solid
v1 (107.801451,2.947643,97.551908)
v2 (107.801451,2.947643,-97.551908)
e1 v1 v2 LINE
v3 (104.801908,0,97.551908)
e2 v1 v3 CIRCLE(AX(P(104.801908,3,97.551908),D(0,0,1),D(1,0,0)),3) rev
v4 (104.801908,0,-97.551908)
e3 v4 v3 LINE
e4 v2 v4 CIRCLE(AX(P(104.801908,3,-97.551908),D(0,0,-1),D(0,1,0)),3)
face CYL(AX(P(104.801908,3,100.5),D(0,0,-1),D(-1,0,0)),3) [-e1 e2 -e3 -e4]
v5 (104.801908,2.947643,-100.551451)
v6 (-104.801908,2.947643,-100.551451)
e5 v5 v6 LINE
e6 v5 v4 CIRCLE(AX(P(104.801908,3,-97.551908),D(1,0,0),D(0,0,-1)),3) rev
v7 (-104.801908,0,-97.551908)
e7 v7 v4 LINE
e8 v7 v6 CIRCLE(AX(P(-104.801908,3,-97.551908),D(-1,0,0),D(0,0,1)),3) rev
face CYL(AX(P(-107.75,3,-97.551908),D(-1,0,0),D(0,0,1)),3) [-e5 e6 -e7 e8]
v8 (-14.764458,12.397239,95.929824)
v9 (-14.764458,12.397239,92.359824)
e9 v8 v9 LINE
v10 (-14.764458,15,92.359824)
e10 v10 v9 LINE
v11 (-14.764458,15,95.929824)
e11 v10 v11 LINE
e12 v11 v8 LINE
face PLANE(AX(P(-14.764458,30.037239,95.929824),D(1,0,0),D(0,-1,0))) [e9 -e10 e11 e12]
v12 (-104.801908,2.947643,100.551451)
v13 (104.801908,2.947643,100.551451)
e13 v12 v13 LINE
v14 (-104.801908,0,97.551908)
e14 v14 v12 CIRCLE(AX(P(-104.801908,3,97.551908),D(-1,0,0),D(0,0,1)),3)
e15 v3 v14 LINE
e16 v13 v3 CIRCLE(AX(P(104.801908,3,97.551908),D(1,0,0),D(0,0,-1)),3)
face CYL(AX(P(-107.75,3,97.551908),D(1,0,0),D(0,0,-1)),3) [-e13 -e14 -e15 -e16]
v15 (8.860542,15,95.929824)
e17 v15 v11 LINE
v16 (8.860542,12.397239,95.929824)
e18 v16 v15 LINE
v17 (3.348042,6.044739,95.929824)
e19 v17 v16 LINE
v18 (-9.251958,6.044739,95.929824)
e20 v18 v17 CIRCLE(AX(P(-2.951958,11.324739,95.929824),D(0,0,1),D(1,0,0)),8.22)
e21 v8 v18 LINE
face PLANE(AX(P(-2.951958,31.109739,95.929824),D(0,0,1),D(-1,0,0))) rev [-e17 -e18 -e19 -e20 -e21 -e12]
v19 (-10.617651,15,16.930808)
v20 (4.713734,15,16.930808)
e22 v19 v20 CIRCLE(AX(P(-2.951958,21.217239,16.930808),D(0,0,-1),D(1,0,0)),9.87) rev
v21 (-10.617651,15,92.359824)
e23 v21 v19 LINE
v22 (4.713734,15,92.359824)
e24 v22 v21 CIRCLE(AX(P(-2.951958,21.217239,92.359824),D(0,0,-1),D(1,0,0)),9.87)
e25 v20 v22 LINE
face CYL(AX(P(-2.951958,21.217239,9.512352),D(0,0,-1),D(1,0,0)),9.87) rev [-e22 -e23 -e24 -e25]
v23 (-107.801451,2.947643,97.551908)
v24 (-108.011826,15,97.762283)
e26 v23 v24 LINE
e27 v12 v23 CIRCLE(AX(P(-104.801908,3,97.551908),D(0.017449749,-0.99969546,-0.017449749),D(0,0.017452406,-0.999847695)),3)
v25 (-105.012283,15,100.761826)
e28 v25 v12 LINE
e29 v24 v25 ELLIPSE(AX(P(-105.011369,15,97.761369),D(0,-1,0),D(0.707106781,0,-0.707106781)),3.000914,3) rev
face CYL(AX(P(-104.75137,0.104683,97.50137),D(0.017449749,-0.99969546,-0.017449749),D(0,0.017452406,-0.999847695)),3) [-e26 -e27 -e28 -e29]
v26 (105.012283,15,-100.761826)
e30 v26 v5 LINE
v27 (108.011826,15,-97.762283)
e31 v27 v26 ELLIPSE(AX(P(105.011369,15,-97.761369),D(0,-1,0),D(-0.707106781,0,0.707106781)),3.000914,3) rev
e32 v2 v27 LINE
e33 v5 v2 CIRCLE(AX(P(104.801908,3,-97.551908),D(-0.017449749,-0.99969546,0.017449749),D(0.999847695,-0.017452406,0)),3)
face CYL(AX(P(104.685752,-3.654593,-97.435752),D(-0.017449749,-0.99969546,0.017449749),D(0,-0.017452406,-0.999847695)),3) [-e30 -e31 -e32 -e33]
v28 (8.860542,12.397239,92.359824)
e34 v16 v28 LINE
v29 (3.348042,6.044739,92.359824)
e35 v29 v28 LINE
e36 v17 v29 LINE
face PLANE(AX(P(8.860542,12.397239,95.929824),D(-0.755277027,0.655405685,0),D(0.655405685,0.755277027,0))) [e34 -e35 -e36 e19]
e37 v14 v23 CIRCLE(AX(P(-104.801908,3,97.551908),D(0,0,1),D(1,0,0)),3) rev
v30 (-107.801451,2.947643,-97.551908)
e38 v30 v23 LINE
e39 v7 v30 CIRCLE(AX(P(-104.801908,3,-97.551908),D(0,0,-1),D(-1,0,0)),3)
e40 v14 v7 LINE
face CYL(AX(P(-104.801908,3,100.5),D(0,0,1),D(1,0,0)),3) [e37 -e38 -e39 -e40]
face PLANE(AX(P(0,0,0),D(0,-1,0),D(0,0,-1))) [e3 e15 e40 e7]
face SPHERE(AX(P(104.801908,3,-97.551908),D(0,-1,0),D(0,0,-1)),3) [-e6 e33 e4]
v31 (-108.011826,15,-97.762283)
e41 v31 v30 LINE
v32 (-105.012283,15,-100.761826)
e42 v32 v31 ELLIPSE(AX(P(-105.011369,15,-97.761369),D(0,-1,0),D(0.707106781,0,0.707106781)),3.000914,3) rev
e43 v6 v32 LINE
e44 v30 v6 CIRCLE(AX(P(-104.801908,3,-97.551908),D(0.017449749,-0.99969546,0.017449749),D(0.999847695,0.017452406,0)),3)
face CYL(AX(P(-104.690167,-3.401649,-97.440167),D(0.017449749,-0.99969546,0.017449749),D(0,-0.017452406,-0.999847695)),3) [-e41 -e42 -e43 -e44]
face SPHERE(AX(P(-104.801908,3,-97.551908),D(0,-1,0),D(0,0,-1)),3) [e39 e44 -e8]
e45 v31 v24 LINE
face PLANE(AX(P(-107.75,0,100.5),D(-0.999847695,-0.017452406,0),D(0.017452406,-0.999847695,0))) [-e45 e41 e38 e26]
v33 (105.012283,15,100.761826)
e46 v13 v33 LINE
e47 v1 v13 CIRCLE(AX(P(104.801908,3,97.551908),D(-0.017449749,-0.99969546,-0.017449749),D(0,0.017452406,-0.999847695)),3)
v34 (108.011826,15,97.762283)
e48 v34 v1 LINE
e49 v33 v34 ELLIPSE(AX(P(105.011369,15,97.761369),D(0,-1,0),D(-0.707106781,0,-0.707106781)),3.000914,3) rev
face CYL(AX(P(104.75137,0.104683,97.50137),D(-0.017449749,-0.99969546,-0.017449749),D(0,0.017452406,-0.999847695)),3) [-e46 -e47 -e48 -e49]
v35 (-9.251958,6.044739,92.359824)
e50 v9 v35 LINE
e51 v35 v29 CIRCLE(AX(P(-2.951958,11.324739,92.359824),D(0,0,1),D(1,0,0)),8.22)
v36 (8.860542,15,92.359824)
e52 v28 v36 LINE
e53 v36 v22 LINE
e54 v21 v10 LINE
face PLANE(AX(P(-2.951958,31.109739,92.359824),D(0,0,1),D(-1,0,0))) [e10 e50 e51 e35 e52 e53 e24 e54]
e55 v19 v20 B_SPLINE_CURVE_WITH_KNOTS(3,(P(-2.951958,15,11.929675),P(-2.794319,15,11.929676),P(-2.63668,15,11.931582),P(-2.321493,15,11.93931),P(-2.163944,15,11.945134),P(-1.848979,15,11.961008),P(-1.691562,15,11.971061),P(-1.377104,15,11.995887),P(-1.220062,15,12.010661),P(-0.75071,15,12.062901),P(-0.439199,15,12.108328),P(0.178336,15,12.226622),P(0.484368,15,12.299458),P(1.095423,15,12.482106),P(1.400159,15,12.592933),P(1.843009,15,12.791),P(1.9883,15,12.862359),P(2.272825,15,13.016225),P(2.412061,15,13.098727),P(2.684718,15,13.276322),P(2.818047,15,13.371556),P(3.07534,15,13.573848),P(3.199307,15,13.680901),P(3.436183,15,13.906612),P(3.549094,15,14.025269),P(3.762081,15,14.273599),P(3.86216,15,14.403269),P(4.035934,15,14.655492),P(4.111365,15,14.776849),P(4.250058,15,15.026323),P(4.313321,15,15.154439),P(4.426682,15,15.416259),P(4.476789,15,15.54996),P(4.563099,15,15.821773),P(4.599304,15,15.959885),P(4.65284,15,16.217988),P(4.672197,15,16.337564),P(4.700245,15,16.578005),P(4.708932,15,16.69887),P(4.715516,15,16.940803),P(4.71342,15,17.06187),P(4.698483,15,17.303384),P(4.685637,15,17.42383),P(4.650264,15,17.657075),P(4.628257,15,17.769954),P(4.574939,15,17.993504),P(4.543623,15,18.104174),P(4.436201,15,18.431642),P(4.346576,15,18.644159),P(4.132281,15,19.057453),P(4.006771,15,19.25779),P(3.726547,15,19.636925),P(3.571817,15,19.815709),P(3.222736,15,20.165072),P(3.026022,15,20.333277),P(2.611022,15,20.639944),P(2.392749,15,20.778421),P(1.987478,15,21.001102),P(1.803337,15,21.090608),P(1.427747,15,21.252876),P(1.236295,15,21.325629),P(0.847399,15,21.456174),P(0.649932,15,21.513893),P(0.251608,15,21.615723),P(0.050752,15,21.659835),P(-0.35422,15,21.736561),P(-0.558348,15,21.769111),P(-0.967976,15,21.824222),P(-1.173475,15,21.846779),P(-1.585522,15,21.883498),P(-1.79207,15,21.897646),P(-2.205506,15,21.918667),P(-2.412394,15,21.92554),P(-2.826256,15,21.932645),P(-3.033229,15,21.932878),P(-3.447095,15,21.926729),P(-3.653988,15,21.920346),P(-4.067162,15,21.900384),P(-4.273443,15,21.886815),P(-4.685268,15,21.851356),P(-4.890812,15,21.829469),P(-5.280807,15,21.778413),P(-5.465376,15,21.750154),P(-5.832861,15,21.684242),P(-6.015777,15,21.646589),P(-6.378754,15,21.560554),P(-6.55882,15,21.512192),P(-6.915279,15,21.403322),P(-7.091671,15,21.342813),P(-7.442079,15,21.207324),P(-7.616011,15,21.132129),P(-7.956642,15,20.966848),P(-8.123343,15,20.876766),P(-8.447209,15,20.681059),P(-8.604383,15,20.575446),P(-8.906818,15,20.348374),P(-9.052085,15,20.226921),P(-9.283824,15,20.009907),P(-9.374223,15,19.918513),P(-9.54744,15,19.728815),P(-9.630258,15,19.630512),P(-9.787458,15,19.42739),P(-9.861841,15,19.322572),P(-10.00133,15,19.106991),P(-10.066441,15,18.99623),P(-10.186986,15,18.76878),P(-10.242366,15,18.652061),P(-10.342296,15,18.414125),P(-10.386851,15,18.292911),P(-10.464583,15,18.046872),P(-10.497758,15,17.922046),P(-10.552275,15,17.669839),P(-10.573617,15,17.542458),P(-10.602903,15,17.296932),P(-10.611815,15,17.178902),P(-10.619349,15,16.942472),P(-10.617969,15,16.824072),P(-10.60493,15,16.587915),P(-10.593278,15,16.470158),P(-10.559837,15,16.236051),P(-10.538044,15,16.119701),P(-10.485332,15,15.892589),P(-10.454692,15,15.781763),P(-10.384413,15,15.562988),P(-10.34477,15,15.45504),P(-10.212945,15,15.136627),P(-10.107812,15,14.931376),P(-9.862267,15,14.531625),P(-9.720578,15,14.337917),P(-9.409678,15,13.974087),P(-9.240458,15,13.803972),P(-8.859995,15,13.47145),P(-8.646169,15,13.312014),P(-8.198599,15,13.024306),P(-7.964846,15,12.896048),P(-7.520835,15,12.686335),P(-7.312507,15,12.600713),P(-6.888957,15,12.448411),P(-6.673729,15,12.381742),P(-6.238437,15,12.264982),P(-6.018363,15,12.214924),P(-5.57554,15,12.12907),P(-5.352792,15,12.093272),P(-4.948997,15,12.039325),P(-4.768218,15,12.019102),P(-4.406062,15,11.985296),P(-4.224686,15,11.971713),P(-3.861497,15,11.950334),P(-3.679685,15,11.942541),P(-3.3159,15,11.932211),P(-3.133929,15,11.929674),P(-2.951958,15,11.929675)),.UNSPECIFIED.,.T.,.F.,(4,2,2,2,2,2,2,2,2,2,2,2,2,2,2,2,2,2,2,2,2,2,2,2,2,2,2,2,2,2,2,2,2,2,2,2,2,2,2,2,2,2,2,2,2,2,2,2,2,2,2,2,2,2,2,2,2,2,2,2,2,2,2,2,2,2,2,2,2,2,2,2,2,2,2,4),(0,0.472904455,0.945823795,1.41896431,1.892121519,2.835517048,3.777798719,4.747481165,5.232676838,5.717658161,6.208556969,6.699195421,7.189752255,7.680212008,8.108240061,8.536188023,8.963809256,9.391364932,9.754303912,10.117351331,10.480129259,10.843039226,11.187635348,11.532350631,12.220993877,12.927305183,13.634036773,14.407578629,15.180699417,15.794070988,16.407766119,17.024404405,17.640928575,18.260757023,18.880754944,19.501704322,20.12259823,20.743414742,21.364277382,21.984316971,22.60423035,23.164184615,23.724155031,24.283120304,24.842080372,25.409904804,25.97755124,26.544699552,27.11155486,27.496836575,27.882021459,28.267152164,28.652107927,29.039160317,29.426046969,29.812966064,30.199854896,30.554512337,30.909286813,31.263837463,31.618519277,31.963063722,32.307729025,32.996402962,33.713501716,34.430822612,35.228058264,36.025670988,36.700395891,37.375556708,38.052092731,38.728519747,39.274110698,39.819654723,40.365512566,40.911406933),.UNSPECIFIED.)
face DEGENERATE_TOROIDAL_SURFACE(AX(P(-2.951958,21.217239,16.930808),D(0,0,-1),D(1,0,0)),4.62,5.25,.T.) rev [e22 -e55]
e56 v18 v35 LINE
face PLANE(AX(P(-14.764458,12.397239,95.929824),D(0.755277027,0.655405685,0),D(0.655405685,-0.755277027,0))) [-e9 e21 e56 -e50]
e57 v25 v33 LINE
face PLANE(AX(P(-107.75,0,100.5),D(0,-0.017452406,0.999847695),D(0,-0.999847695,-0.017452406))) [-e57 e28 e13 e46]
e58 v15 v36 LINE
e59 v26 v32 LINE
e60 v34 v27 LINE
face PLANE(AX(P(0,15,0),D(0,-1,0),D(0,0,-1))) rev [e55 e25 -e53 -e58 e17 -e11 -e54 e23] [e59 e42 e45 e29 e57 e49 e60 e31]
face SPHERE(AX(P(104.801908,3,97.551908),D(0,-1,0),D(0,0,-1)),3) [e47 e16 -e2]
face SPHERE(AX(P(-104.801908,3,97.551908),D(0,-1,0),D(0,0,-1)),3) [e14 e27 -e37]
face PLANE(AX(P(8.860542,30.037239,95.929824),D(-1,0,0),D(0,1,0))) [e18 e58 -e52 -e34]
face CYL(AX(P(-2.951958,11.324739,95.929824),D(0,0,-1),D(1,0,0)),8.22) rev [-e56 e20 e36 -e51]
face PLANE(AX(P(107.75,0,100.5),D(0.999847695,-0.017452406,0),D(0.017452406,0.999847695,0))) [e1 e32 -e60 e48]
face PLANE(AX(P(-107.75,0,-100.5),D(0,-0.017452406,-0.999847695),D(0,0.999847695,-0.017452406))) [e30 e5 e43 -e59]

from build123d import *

# Parameters (mm, degrees)
SKETCH1_W           = 215.5
SKETCH1_H           = 201
BOSS_EXTRUDE1_DEPTH = 15
BOSS_EXTRUDE1_DRAFT = -1
FILLET1_R           = 3
CAVITY1_START       = 16.930808083
CAVITY1_DEPTH       = 78.999015724
CAVITY1_START_2     = 92.359823807
CAVITY1_2_DEPTH     = 3.57


with BuildPart() as part:
    # Sketch1 → Boss-Extrude1 (with draft: the straight prism first)
    with BuildSketch(Plane(origin=(0, 0, 0), x_dir=(1, 0, 0), z_dir=(0, 1, 0))):
        Rectangle(SKETCH1_W, SKETCH1_H)
    extrude(amount=BOSS_EXTRUDE1_DEPTH)
    # Boss-Extrude1: the draft: its side faces are tilted about the plane it starts from
    boss_extrude1_sides = [part.faces().sort_by_distance(p)[0] for p in [
        (0, 7.5, 100.5),
        (107.75, 7.5, 0),
        (0, 7.5, -100.5),
        (-107.75, 7.5, 0),
    ]]
    draft(boss_extrude1_sides, Plane(origin=(0, 0, 0), x_dir=(1, 0, 0), z_dir=(0, 1, 0)), BOSS_EXTRUDE1_DRAFT)

    # Fillet1
    fillet1_edges = [part.edges().sort_by_distance(p)[0] for p in [
        (0, 0, 100.5),
        (-107.75, 0, 0),
        (0, 0, -100.5),
        (107.75, 0, 0),
        (107.880912987, 7.5, 100.630912987),
        (-107.880912987, 7.5, 100.630912987),
        (-107.880912987, 7.5, -100.630912987),
        (107.880912987, 7.5, -100.630912987),
    ]]
    fillet(fillet1_edges, radius=FILLET1_R)

    # Cavity1: read off the stored shape, not the designer's step
    # Cavity1 outline → Cavity1 (cut)
    with BuildSketch(Plane.XY.offset(CAVITY1_START)):
        with BuildLine():
            ThreePointArc((-10.617650831, 15), (-2.951958482, 11.347239001), (4.713733868, 15))
            Line((4.713733868, 15), (-10.617650831, 15))
        make_face()
    extrude(amount=CAVITY1_DEPTH, mode=Mode.SUBTRACT)

    # Cavity1 2 outline → Cavity1 2 (cut)
    with BuildSketch(Plane.XY.offset(CAVITY1_START_2)):
        with BuildLine():
            Line((8.860541518, 15), (4.713733868, 15))
            ThreePointArc((4.713733868, 15), (-2.951958482, 11.347239001), (-10.617650831, 15))
            Line((-10.617650831, 15), (-14.764458482, 15))
            Line((-14.764458482, 15), (-14.764458482, 12.397239001))
            Line((-14.764458482, 12.397239001), (-9.251958482, 6.044739001))
            ThreePointArc((-9.251958482, 6.044739001), (-2.951958482, 3.104739001), (3.348041518, 6.044739001))
            Line((3.348041518, 6.044739001), (8.860541518, 12.397239001))
            Line((8.860541518, 12.397239001), (8.860541518, 15))
        make_face()
    extrude(amount=CAVITY1_2_DEPTH, mode=Mode.SUBTRACT)

    # Cavity1 3 outline → Cavity1 3 (revolve, cut)
    with BuildSketch(Plane(origin=(-2.951958482, 21.217239001, 0), x_dir=(1, 0, 0), z_dir=(0, -1, 0))):
        with BuildLine():
            ThreePointArc((6.217239001, 11.929675453), (8.859575731, 13.83427815), (9.87, 16.930808083))
            Line((9.87, 16.930808083), (6.217239001, 16.930808083))
            Line((6.217239001, 16.930808083), (6.217239001, 11.929675453))
        make_face()
    revolve(axis=Axis((-2.951958482, 21.217239001, 0), (0, 0, 1)), mode=Mode.SUBTRACT)


solid = part.part
